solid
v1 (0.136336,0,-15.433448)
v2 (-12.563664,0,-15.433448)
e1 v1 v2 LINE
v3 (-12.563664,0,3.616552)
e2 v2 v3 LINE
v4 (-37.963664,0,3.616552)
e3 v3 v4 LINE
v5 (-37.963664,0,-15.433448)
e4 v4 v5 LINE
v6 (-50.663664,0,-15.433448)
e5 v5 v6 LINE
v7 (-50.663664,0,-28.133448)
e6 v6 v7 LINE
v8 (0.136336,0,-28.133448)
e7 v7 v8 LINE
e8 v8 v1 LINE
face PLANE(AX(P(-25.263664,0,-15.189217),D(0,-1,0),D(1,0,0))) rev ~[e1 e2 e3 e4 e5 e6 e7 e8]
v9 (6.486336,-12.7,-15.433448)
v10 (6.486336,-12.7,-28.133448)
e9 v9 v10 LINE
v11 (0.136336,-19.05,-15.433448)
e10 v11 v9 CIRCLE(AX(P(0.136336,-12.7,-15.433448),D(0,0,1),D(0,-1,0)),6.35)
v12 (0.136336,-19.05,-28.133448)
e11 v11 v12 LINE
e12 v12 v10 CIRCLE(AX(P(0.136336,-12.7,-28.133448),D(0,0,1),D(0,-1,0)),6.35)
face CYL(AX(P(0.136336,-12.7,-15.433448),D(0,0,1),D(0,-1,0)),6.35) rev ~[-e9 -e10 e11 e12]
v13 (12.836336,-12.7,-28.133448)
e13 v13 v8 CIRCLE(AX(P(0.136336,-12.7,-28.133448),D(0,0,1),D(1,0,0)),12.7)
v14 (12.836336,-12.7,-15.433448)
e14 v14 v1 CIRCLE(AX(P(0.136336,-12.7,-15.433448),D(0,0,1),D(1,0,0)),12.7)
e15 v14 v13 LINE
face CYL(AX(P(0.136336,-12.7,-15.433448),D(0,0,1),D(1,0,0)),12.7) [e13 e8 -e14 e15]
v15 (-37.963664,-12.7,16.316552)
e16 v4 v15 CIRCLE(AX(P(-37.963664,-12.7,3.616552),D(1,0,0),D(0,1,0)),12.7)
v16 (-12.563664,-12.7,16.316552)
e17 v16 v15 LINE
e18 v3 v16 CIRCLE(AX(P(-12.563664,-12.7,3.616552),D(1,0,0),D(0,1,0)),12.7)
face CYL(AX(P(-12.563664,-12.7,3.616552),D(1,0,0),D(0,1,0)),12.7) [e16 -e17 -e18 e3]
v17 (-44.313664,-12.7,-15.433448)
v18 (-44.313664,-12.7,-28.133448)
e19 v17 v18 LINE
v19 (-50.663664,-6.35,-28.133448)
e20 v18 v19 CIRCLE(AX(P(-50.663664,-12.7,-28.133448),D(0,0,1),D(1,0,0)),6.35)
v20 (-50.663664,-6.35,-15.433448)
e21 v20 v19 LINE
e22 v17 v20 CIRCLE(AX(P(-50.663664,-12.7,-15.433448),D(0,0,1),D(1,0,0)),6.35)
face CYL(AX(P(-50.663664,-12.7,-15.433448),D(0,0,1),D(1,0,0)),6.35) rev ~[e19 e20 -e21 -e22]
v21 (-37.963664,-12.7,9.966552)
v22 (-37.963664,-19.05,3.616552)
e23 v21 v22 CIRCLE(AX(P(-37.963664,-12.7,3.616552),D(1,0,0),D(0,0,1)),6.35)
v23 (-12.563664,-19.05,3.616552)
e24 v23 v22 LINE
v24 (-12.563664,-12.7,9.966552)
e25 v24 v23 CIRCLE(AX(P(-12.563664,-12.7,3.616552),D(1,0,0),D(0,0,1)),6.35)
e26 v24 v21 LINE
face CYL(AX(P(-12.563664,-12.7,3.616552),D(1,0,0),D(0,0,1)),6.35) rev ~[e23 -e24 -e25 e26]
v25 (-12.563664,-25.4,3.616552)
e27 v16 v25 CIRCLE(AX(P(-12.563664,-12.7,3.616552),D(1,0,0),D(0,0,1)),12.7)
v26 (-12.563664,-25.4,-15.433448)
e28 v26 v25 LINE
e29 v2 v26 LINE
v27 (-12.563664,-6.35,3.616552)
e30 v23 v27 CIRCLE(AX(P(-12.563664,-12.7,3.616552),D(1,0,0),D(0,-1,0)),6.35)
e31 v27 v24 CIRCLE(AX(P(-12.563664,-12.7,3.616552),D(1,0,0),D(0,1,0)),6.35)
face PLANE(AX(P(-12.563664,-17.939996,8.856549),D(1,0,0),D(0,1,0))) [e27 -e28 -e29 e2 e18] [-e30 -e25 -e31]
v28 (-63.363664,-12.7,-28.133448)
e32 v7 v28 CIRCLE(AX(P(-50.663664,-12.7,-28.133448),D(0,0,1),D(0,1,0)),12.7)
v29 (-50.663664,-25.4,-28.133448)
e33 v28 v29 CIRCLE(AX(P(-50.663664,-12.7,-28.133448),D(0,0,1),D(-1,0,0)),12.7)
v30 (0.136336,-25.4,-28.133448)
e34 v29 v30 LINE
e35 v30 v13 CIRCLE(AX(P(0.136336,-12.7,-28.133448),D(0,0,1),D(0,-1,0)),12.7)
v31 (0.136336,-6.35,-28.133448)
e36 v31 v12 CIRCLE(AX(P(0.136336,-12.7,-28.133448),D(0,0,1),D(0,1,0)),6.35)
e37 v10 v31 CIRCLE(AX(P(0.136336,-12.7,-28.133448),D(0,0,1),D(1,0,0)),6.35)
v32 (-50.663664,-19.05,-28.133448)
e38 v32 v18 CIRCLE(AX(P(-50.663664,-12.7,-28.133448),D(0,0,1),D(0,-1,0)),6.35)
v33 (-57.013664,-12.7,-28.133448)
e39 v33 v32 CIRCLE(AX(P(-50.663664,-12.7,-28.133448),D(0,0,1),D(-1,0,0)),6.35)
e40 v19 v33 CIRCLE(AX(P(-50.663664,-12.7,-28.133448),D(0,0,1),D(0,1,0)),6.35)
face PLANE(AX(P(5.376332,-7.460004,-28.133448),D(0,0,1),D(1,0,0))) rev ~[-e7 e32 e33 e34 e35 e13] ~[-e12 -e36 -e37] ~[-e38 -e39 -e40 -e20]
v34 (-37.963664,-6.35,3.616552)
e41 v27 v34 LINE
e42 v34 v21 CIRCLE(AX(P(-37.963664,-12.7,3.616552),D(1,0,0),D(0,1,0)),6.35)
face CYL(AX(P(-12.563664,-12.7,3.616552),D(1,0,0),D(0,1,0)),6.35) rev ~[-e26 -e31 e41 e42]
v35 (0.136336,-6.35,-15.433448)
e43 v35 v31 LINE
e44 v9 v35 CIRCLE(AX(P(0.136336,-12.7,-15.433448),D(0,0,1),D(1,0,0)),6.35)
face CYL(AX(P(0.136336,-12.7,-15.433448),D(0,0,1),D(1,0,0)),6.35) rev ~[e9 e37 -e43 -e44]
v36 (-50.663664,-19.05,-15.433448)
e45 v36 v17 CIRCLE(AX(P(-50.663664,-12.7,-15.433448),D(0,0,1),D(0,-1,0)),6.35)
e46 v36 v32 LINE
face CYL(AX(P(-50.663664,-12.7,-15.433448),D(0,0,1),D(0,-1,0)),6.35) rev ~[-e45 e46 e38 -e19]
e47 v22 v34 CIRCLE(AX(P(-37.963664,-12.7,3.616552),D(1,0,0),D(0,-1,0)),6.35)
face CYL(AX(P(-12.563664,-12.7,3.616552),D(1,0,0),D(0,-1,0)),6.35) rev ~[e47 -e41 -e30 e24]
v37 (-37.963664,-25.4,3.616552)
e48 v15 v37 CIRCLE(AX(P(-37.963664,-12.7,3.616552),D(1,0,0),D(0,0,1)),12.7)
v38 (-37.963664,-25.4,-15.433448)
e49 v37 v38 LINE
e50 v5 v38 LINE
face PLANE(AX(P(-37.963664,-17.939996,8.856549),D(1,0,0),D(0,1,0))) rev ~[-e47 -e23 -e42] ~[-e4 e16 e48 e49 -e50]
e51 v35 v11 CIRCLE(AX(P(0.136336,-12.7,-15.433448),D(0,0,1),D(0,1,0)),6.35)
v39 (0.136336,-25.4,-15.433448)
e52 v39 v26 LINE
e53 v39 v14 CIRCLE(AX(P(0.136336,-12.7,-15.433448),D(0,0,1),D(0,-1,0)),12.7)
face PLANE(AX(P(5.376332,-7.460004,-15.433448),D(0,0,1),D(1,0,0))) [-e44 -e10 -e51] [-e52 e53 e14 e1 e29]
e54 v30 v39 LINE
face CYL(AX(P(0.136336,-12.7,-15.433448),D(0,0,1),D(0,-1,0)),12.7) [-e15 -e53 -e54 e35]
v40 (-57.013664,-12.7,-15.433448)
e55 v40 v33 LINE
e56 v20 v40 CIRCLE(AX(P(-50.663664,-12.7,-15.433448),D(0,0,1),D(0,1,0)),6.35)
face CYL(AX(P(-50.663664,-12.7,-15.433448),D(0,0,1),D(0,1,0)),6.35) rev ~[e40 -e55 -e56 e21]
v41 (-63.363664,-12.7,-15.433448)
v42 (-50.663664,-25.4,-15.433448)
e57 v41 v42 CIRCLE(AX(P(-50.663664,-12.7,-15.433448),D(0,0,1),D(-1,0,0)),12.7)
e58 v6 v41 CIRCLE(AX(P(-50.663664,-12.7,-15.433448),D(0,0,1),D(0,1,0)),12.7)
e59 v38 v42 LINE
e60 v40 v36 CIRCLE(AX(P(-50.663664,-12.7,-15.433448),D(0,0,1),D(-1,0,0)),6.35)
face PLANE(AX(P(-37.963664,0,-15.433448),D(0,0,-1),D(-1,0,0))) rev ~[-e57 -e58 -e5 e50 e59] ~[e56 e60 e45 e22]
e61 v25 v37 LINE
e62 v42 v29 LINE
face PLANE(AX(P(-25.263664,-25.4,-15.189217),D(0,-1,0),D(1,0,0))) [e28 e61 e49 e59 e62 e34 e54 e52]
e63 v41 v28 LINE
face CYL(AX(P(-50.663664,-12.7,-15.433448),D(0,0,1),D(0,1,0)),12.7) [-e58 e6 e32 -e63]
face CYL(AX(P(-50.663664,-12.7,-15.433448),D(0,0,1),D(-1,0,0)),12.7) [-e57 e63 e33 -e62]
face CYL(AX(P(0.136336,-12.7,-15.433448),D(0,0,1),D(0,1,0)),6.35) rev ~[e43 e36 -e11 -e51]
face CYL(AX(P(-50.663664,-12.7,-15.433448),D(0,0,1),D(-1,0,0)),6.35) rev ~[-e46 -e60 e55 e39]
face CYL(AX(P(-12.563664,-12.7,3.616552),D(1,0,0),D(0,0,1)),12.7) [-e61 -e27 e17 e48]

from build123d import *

# Parameters (mm, degrees)
F1_DEPTH = 25.4
F3_DEPTH = 12.7
F5_DEPTH = 25.4
F7_DEPTH = 25.4
F9_DEPTH = 12.7


with BuildPart() as f1:
    # F0 (on Front) → F1 (new body)
    with BuildSketch(Plane.XZ):
        Polygon((-37.9636640911, -15.4334478322), (-50.6636640911, -15.4334478322), (-50.6636640911, -28.1334478322), (0.1363359089, -28.1334478322), (0.1363359089, -15.4334478322), (-12.5636640911, -15.4334478322), (-12.5636640911, 3.6165521678), (-37.9636640911, 3.6165521678), align=None)
    extrude(amount=F1_DEPTH)

    # F2 (on face) → F3 (join)
    with BuildSketch(Plane.XY.offset(-15.4334478322)):
        with BuildLine():
            ThreePointArc((12.8363359089, -12.7), (9.11659203, -3.7197438789), (0.1363359089, 0))
            Line((0.1363359089, 0), (0.1363359089, -12.7))
            Line((0.1363359089, -12.7), (12.8363359089, -12.7))
        make_face()
        with BuildLine():
            Line((12.8363359089, -12.7), (0.1363359089, -12.7))
            Line((0.1363359089, -12.7), (0.1363359089, -25.4))
            ThreePointArc((0.1363359089, -25.4), (9.11659203, -21.6802561211), (12.8363359089, -12.7))
        make_face()
        with BuildLine():
            Line((-50.6636640911, -12.7), (-50.6636640911, 0))
            ThreePointArc((-50.6636640911, 0), (-59.6439202122, -3.7197438789), (-63.3636640911, -12.7))
            Line((-63.3636640911, -12.7), (-50.6636640911, -12.7))
        make_face()
        with BuildLine():
            Line((-50.6636640911, -25.4), (-50.6636640911, -12.7))
            Line((-50.6636640911, -12.7), (-63.3636640911, -12.7))
            ThreePointArc((-63.3636640911, -12.7), (-59.6439202122, -21.6802561211), (-50.6636640911, -25.4))
        make_face()
    extrude(amount=-F3_DEPTH)

    # F4 (on face) → F5 (join)
    with BuildSketch(Plane.YZ.offset(-12.5636640911)):
        with BuildLine():
            ThreePointArc((-12.7, 16.3165521678), (-21.6802561211, 12.5968082888), (-25.4, 3.6165521678))
            Line((-25.4, 3.6165521678), (-12.7, 3.6165521678))
            Line((-12.7, 3.6165521678), (-12.7, 16.3165521678))
        make_face()
        with BuildLine():
            Line((-12.7, 16.3165521678), (-12.7, 3.6165521678))
            Line((-12.7, 3.6165521678), (0, 3.6165521678))
            ThreePointArc((0, 3.6165521678), (-3.7197438789, 12.5968082888), (-12.7, 16.3165521678))
        make_face()
    extrude(amount=-F5_DEPTH)

    # F6 (on face) → F7 (cut)
    with BuildSketch(Plane.YZ.offset(-12.5636640911)):
        with BuildLine():
            ThreePointArc((-6.35, 3.6165521678), (-8.2098719395, 8.1066802283), (-12.7, 9.9665521678))
            ThreePointArc((-12.7, 9.9665521678), (-17.1901280605, 8.1066802283), (-19.05, 3.6165521678))
            ThreePointArc((-19.05, 3.6165521678), (-12.7, -2.7334478322), (-6.35, 3.6165521678))
        make_face()
    extrude(amount=-F7_DEPTH, mode=Mode.SUBTRACT)

    # F8 (on face) → F9 (cut)
    with BuildSketch(Plane.XY.offset(-15.4334478322)):
        with BuildLine():
            ThreePointArc((-44.3136640911, -12.7), (-46.1735360306, -8.2098719395), (-50.6636640911, -6.35))
            ThreePointArc((-50.6636640911, -6.35), (-55.1537921516, -8.2098719395), (-57.0136640911, -12.7))
            ThreePointArc((-57.0136640911, -12.7), (-55.1537921516, -17.1901280605), (-50.6636640911, -19.05))
            ThreePointArc((-50.6636640911, -19.05), (-46.1735360306, -17.1901280605), (-44.3136640911, -12.7))
        make_face()
        with BuildLine():
            ThreePointArc((0.1363359089, -19.05), (4.6264639694, -17.1901280605), (6.4863359089, -12.7))
            ThreePointArc((6.4863359089, -12.7), (4.6264639694, -8.2098719395), (0.1363359089, -6.35))
            ThreePointArc((0.1363359089, -6.35), (-6.2136640911, -12.7), (0.1363359089, -19.05))
        make_face()
    extrude(amount=-F9_DEPTH, mode=Mode.SUBTRACT)


solid = f1.part
